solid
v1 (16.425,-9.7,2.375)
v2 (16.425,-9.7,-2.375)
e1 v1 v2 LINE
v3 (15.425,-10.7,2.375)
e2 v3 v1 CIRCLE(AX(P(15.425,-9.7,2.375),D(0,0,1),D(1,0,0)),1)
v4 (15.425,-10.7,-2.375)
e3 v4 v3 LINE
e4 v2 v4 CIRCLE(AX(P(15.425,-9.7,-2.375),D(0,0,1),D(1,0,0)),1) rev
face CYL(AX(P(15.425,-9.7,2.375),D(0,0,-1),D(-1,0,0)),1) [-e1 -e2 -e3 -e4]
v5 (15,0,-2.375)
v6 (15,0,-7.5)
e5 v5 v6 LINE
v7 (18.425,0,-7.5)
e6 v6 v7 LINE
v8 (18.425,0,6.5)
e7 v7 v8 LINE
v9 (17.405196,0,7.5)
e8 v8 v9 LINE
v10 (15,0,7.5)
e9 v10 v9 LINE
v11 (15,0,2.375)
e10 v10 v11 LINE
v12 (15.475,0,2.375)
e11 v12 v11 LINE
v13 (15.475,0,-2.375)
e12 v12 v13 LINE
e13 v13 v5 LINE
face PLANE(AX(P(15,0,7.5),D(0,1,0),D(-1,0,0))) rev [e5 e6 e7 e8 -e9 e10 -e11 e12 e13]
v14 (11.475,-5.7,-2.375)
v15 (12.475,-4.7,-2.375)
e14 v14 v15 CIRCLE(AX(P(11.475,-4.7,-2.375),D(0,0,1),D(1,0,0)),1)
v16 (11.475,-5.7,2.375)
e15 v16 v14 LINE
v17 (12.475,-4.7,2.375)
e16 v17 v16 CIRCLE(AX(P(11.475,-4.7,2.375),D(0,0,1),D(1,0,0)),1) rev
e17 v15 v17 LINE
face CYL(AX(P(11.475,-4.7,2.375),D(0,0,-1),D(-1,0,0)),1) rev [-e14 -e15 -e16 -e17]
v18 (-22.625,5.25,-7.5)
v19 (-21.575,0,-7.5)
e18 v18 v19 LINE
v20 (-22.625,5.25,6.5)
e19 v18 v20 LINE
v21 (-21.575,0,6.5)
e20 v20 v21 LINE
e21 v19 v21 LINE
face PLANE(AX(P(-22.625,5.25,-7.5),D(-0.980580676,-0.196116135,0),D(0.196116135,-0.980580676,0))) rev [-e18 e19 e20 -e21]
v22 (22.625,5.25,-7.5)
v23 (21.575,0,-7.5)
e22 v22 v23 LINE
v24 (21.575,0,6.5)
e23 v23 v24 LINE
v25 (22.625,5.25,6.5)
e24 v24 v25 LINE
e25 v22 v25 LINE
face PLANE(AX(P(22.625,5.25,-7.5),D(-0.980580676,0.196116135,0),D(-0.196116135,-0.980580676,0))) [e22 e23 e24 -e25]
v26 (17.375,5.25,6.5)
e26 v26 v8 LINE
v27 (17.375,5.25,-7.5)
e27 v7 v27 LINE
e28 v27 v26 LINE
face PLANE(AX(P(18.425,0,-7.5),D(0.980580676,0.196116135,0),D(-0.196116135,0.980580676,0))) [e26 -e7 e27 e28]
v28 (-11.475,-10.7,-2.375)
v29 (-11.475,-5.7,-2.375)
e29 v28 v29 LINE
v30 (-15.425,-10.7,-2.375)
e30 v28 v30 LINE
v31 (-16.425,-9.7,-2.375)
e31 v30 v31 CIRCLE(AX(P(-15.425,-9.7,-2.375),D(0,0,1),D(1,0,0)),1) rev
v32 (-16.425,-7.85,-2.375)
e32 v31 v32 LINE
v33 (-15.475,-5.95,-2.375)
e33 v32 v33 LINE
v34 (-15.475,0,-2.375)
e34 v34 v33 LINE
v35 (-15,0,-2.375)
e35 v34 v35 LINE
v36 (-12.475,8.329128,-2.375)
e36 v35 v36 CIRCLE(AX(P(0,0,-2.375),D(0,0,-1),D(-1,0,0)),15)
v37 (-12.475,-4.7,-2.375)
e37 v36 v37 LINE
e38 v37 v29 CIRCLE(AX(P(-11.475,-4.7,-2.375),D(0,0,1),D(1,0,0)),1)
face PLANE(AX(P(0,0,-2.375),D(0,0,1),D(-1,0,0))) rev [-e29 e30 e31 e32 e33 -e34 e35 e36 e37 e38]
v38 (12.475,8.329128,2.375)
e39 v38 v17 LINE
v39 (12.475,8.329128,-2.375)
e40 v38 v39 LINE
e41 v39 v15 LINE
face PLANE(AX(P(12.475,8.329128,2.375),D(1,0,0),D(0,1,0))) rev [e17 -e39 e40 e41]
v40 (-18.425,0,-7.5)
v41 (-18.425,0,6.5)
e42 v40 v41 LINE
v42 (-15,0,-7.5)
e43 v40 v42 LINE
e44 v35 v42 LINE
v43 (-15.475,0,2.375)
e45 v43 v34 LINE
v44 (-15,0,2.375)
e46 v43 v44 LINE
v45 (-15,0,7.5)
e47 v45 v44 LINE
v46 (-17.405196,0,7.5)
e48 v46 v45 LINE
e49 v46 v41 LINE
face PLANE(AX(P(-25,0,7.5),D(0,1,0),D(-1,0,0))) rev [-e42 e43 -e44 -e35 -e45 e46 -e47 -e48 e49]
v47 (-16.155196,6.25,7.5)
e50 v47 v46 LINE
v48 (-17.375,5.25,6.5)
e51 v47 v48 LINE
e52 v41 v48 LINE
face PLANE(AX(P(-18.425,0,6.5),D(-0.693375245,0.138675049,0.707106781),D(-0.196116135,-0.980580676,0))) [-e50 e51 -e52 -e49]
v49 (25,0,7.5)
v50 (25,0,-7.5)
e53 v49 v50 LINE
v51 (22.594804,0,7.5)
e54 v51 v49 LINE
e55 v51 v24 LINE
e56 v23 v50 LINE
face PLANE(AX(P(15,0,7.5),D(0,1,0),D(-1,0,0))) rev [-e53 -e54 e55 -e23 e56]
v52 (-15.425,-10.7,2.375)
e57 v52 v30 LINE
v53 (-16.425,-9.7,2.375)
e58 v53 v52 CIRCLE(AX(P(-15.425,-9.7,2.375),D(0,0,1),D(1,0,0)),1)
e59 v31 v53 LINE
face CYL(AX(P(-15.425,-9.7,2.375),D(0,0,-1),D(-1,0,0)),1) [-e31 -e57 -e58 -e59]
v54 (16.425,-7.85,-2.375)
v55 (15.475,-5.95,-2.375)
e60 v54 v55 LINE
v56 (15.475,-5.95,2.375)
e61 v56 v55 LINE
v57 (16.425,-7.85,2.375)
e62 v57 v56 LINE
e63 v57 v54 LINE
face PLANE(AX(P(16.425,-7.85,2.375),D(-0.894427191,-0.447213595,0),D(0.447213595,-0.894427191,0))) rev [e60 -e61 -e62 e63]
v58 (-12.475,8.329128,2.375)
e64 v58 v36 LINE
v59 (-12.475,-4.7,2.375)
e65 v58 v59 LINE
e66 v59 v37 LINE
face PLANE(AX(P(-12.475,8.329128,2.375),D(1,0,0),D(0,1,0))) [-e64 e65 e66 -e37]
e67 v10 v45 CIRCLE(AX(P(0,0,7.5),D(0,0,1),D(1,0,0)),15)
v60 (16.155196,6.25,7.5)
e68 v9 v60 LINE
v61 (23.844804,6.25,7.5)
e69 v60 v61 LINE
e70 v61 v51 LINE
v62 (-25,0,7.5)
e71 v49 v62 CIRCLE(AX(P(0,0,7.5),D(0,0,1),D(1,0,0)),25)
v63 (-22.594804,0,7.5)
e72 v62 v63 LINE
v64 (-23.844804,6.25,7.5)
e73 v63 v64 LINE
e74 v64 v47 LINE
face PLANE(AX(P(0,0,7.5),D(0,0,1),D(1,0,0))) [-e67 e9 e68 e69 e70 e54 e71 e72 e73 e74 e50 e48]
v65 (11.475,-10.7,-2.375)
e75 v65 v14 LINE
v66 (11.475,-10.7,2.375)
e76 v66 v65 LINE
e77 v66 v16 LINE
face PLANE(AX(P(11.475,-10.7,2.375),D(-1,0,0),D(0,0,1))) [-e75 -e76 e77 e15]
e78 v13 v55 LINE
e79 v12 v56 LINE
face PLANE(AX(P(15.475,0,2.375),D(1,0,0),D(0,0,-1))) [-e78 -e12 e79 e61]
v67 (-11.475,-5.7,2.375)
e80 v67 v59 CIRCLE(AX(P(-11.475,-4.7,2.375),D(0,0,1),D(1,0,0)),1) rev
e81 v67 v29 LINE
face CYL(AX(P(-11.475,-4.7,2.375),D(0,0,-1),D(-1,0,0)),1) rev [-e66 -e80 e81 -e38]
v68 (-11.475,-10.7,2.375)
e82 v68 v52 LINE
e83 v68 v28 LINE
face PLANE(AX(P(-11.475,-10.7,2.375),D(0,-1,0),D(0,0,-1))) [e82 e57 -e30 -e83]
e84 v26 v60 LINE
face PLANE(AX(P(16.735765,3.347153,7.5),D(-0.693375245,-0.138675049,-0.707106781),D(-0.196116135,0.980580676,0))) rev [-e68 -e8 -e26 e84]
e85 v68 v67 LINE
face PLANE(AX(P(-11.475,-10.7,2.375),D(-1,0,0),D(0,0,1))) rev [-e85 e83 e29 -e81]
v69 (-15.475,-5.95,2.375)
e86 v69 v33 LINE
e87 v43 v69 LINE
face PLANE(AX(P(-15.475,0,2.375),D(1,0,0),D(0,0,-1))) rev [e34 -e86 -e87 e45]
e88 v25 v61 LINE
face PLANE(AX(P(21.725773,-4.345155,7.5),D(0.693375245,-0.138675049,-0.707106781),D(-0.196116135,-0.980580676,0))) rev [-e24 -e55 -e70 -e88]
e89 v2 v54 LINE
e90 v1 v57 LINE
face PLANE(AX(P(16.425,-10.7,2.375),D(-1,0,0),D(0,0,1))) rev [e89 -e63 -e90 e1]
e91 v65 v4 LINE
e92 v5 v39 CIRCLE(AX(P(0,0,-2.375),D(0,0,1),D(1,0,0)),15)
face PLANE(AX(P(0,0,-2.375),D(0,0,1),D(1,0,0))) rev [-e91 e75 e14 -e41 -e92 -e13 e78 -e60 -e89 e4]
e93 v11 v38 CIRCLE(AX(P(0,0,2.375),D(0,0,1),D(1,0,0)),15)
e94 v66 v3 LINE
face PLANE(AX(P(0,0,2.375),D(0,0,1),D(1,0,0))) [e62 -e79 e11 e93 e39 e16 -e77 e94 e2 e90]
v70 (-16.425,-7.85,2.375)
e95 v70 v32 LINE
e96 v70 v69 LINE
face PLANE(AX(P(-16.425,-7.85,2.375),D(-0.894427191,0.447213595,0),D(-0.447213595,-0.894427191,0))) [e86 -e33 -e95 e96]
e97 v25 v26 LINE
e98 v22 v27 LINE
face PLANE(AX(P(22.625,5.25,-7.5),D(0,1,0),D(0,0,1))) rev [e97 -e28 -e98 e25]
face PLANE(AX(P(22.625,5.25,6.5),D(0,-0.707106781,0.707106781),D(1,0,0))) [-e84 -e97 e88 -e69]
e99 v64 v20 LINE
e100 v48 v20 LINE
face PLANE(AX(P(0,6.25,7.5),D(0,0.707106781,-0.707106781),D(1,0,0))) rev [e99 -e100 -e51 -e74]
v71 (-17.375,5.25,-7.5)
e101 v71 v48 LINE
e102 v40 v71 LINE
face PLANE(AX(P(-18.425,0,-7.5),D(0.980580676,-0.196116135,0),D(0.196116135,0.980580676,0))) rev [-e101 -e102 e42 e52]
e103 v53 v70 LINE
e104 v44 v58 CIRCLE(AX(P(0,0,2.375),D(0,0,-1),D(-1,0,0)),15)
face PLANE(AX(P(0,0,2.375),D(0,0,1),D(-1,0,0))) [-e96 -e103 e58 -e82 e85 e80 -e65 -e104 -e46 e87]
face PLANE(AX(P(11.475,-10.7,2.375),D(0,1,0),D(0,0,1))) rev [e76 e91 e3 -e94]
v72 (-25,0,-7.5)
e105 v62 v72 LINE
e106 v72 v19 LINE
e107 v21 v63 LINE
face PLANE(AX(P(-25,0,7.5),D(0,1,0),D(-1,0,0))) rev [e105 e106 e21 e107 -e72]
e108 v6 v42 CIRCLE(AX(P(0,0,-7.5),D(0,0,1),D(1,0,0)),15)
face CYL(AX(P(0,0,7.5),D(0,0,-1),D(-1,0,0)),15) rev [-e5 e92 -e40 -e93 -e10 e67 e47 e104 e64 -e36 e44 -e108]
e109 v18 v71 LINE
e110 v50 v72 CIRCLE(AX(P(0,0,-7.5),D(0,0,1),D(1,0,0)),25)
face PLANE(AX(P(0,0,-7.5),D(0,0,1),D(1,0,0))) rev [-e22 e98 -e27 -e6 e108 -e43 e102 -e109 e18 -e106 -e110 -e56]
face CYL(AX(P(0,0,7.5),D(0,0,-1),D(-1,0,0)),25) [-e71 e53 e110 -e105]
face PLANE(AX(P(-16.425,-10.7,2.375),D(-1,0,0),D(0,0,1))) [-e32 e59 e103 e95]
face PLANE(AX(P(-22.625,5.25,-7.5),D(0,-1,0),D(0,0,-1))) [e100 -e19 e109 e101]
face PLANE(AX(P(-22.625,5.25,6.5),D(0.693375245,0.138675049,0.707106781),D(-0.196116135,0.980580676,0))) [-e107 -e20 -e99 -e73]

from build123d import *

# Parameters (mm, degrees)
BOSS_EXTRUDE1_DEPTH = 7.5
CUT_EXTRUDE1_DEPTH  = 39.405728739
BOSS_EXTRUDE3_DEPTH = 2.375
FILLET1_R           = 1
FILLET2_R           = 1
FILLET3_R           = 1
FILLET4_R           = 1
CHAMFER1_SIZE       = 1
CHAMFER2_SIZE       = 1


with BuildPart() as part:
    # Sketch1 → Boss-Extrude1 (new, symmetric)
    with BuildSketch(Plane.XY):
        with BuildLine():
            Line((-25, 0), (-15, 0))
            ThreePointArc((-15, 0), (0, 15), (15, 0))
            Line((15, 0), (25, 0))
            ThreePointArc((25, 0), (0, 25), (-25, 0))
        make_face()
    extrude(amount=BOSS_EXTRUDE1_DEPTH, both=True)

    # Sketch2 → Cut-Extrude1 (cut, through all)
    with BuildSketch(Plane.XY.offset(7.5)):
        Polygon((-22.625, 5.25), (-17.375, 5.25), (-18.425, 0), (-21.575, 0), align=None)
    cut_extrude1 = extrude(amount=-CUT_EXTRUDE1_DEPTH, mode=Mode.SUBTRACT)

    # Mirror1: Cut-Extrude1 across plane
    add(cut_extrude1.mirror(Plane(origin=(0, 0, 0), x_dir=(0, 0, 1), z_dir=(1, 0, 0))), mode=Mode.SUBTRACT)

    # Sketch3 → Boss-Extrude3 (add, symmetric)
    with BuildSketch(Plane.XY):
        with BuildLine():
            Line((12.475, 8.329128106), (12.475, -5.7))
            Line((12.475, -5.7), (11.475, -5.7))
            Line((11.475, -5.7), (11.475, -10.7))
            Line((11.475, -10.7), (16.425, -10.7))
            Line((16.425, -10.7), (16.425, -7.85))
            Line((16.425, -7.85), (15.475, -5.95))
            Line((15.475, -5.95), (15.475, 0))
            Line((15.475, 0), (15, 0))
            ThreePointArc((15, 0), (14.35487722, 4.351723796), (12.475, 8.329128106))
        make_face()
    boss_extrude3 = extrude(amount=BOSS_EXTRUDE3_DEPTH, both=True)

    # Mirror11: Boss-Extrude3 across plane
    add(boss_extrude3.mirror(Plane(origin=(0, 0, 0), x_dir=(0, 0, 1), z_dir=(1, 0, 0))))

    # Fillet1
    fillet1_edges = [part.edges().sort_by_distance(p)[0] for p in [
        (16.425, -10.7, 0),
    ]]
    fillet(fillet1_edges, radius=FILLET1_R)

    # Fillet2
    fillet2_edges = [part.edges().sort_by_distance(p)[0] for p in [
        (-16.425, -10.7, 0),
    ]]
    fillet(fillet2_edges, radius=FILLET2_R)

    # Fillet3
    fillet3_edges = [part.edges().sort_by_distance(p)[0] for p in [
        (-12.475, -5.7, 0),
    ]]
    fillet(fillet3_edges, radius=FILLET3_R - 0.0001)  # a hair under: the kernel refuses the full size

    # Fillet4
    fillet4_edges = [part.edges().sort_by_distance(p)[0] for p in [
        (12.475, -5.7, 0),
    ]]
    fillet(fillet4_edges, radius=FILLET4_R - 0.0001)  # a hair under: the kernel refuses the full size

    # Chamfer1
    chamfer1_edges = [part.edges().sort_by_distance(p)[0] for p in [
        (-20, 5.25, 7.5),
        (-22.1, 2.625, 7.5),
        (-17.9, 2.625, 7.5),
    ]]
    chamfer(chamfer1_edges, length=CHAMFER1_SIZE)

    # Chamfer2
    chamfer2_edges = [part.edges().sort_by_distance(p)[0] for p in [
        (22.1, 2.625, 7.5),
        (17.9, 2.625, 7.5),
        (20, 5.25, 7.5),
    ]]
    chamfer(chamfer2_edges, length=CHAMFER2_SIZE)


solid = part.part
